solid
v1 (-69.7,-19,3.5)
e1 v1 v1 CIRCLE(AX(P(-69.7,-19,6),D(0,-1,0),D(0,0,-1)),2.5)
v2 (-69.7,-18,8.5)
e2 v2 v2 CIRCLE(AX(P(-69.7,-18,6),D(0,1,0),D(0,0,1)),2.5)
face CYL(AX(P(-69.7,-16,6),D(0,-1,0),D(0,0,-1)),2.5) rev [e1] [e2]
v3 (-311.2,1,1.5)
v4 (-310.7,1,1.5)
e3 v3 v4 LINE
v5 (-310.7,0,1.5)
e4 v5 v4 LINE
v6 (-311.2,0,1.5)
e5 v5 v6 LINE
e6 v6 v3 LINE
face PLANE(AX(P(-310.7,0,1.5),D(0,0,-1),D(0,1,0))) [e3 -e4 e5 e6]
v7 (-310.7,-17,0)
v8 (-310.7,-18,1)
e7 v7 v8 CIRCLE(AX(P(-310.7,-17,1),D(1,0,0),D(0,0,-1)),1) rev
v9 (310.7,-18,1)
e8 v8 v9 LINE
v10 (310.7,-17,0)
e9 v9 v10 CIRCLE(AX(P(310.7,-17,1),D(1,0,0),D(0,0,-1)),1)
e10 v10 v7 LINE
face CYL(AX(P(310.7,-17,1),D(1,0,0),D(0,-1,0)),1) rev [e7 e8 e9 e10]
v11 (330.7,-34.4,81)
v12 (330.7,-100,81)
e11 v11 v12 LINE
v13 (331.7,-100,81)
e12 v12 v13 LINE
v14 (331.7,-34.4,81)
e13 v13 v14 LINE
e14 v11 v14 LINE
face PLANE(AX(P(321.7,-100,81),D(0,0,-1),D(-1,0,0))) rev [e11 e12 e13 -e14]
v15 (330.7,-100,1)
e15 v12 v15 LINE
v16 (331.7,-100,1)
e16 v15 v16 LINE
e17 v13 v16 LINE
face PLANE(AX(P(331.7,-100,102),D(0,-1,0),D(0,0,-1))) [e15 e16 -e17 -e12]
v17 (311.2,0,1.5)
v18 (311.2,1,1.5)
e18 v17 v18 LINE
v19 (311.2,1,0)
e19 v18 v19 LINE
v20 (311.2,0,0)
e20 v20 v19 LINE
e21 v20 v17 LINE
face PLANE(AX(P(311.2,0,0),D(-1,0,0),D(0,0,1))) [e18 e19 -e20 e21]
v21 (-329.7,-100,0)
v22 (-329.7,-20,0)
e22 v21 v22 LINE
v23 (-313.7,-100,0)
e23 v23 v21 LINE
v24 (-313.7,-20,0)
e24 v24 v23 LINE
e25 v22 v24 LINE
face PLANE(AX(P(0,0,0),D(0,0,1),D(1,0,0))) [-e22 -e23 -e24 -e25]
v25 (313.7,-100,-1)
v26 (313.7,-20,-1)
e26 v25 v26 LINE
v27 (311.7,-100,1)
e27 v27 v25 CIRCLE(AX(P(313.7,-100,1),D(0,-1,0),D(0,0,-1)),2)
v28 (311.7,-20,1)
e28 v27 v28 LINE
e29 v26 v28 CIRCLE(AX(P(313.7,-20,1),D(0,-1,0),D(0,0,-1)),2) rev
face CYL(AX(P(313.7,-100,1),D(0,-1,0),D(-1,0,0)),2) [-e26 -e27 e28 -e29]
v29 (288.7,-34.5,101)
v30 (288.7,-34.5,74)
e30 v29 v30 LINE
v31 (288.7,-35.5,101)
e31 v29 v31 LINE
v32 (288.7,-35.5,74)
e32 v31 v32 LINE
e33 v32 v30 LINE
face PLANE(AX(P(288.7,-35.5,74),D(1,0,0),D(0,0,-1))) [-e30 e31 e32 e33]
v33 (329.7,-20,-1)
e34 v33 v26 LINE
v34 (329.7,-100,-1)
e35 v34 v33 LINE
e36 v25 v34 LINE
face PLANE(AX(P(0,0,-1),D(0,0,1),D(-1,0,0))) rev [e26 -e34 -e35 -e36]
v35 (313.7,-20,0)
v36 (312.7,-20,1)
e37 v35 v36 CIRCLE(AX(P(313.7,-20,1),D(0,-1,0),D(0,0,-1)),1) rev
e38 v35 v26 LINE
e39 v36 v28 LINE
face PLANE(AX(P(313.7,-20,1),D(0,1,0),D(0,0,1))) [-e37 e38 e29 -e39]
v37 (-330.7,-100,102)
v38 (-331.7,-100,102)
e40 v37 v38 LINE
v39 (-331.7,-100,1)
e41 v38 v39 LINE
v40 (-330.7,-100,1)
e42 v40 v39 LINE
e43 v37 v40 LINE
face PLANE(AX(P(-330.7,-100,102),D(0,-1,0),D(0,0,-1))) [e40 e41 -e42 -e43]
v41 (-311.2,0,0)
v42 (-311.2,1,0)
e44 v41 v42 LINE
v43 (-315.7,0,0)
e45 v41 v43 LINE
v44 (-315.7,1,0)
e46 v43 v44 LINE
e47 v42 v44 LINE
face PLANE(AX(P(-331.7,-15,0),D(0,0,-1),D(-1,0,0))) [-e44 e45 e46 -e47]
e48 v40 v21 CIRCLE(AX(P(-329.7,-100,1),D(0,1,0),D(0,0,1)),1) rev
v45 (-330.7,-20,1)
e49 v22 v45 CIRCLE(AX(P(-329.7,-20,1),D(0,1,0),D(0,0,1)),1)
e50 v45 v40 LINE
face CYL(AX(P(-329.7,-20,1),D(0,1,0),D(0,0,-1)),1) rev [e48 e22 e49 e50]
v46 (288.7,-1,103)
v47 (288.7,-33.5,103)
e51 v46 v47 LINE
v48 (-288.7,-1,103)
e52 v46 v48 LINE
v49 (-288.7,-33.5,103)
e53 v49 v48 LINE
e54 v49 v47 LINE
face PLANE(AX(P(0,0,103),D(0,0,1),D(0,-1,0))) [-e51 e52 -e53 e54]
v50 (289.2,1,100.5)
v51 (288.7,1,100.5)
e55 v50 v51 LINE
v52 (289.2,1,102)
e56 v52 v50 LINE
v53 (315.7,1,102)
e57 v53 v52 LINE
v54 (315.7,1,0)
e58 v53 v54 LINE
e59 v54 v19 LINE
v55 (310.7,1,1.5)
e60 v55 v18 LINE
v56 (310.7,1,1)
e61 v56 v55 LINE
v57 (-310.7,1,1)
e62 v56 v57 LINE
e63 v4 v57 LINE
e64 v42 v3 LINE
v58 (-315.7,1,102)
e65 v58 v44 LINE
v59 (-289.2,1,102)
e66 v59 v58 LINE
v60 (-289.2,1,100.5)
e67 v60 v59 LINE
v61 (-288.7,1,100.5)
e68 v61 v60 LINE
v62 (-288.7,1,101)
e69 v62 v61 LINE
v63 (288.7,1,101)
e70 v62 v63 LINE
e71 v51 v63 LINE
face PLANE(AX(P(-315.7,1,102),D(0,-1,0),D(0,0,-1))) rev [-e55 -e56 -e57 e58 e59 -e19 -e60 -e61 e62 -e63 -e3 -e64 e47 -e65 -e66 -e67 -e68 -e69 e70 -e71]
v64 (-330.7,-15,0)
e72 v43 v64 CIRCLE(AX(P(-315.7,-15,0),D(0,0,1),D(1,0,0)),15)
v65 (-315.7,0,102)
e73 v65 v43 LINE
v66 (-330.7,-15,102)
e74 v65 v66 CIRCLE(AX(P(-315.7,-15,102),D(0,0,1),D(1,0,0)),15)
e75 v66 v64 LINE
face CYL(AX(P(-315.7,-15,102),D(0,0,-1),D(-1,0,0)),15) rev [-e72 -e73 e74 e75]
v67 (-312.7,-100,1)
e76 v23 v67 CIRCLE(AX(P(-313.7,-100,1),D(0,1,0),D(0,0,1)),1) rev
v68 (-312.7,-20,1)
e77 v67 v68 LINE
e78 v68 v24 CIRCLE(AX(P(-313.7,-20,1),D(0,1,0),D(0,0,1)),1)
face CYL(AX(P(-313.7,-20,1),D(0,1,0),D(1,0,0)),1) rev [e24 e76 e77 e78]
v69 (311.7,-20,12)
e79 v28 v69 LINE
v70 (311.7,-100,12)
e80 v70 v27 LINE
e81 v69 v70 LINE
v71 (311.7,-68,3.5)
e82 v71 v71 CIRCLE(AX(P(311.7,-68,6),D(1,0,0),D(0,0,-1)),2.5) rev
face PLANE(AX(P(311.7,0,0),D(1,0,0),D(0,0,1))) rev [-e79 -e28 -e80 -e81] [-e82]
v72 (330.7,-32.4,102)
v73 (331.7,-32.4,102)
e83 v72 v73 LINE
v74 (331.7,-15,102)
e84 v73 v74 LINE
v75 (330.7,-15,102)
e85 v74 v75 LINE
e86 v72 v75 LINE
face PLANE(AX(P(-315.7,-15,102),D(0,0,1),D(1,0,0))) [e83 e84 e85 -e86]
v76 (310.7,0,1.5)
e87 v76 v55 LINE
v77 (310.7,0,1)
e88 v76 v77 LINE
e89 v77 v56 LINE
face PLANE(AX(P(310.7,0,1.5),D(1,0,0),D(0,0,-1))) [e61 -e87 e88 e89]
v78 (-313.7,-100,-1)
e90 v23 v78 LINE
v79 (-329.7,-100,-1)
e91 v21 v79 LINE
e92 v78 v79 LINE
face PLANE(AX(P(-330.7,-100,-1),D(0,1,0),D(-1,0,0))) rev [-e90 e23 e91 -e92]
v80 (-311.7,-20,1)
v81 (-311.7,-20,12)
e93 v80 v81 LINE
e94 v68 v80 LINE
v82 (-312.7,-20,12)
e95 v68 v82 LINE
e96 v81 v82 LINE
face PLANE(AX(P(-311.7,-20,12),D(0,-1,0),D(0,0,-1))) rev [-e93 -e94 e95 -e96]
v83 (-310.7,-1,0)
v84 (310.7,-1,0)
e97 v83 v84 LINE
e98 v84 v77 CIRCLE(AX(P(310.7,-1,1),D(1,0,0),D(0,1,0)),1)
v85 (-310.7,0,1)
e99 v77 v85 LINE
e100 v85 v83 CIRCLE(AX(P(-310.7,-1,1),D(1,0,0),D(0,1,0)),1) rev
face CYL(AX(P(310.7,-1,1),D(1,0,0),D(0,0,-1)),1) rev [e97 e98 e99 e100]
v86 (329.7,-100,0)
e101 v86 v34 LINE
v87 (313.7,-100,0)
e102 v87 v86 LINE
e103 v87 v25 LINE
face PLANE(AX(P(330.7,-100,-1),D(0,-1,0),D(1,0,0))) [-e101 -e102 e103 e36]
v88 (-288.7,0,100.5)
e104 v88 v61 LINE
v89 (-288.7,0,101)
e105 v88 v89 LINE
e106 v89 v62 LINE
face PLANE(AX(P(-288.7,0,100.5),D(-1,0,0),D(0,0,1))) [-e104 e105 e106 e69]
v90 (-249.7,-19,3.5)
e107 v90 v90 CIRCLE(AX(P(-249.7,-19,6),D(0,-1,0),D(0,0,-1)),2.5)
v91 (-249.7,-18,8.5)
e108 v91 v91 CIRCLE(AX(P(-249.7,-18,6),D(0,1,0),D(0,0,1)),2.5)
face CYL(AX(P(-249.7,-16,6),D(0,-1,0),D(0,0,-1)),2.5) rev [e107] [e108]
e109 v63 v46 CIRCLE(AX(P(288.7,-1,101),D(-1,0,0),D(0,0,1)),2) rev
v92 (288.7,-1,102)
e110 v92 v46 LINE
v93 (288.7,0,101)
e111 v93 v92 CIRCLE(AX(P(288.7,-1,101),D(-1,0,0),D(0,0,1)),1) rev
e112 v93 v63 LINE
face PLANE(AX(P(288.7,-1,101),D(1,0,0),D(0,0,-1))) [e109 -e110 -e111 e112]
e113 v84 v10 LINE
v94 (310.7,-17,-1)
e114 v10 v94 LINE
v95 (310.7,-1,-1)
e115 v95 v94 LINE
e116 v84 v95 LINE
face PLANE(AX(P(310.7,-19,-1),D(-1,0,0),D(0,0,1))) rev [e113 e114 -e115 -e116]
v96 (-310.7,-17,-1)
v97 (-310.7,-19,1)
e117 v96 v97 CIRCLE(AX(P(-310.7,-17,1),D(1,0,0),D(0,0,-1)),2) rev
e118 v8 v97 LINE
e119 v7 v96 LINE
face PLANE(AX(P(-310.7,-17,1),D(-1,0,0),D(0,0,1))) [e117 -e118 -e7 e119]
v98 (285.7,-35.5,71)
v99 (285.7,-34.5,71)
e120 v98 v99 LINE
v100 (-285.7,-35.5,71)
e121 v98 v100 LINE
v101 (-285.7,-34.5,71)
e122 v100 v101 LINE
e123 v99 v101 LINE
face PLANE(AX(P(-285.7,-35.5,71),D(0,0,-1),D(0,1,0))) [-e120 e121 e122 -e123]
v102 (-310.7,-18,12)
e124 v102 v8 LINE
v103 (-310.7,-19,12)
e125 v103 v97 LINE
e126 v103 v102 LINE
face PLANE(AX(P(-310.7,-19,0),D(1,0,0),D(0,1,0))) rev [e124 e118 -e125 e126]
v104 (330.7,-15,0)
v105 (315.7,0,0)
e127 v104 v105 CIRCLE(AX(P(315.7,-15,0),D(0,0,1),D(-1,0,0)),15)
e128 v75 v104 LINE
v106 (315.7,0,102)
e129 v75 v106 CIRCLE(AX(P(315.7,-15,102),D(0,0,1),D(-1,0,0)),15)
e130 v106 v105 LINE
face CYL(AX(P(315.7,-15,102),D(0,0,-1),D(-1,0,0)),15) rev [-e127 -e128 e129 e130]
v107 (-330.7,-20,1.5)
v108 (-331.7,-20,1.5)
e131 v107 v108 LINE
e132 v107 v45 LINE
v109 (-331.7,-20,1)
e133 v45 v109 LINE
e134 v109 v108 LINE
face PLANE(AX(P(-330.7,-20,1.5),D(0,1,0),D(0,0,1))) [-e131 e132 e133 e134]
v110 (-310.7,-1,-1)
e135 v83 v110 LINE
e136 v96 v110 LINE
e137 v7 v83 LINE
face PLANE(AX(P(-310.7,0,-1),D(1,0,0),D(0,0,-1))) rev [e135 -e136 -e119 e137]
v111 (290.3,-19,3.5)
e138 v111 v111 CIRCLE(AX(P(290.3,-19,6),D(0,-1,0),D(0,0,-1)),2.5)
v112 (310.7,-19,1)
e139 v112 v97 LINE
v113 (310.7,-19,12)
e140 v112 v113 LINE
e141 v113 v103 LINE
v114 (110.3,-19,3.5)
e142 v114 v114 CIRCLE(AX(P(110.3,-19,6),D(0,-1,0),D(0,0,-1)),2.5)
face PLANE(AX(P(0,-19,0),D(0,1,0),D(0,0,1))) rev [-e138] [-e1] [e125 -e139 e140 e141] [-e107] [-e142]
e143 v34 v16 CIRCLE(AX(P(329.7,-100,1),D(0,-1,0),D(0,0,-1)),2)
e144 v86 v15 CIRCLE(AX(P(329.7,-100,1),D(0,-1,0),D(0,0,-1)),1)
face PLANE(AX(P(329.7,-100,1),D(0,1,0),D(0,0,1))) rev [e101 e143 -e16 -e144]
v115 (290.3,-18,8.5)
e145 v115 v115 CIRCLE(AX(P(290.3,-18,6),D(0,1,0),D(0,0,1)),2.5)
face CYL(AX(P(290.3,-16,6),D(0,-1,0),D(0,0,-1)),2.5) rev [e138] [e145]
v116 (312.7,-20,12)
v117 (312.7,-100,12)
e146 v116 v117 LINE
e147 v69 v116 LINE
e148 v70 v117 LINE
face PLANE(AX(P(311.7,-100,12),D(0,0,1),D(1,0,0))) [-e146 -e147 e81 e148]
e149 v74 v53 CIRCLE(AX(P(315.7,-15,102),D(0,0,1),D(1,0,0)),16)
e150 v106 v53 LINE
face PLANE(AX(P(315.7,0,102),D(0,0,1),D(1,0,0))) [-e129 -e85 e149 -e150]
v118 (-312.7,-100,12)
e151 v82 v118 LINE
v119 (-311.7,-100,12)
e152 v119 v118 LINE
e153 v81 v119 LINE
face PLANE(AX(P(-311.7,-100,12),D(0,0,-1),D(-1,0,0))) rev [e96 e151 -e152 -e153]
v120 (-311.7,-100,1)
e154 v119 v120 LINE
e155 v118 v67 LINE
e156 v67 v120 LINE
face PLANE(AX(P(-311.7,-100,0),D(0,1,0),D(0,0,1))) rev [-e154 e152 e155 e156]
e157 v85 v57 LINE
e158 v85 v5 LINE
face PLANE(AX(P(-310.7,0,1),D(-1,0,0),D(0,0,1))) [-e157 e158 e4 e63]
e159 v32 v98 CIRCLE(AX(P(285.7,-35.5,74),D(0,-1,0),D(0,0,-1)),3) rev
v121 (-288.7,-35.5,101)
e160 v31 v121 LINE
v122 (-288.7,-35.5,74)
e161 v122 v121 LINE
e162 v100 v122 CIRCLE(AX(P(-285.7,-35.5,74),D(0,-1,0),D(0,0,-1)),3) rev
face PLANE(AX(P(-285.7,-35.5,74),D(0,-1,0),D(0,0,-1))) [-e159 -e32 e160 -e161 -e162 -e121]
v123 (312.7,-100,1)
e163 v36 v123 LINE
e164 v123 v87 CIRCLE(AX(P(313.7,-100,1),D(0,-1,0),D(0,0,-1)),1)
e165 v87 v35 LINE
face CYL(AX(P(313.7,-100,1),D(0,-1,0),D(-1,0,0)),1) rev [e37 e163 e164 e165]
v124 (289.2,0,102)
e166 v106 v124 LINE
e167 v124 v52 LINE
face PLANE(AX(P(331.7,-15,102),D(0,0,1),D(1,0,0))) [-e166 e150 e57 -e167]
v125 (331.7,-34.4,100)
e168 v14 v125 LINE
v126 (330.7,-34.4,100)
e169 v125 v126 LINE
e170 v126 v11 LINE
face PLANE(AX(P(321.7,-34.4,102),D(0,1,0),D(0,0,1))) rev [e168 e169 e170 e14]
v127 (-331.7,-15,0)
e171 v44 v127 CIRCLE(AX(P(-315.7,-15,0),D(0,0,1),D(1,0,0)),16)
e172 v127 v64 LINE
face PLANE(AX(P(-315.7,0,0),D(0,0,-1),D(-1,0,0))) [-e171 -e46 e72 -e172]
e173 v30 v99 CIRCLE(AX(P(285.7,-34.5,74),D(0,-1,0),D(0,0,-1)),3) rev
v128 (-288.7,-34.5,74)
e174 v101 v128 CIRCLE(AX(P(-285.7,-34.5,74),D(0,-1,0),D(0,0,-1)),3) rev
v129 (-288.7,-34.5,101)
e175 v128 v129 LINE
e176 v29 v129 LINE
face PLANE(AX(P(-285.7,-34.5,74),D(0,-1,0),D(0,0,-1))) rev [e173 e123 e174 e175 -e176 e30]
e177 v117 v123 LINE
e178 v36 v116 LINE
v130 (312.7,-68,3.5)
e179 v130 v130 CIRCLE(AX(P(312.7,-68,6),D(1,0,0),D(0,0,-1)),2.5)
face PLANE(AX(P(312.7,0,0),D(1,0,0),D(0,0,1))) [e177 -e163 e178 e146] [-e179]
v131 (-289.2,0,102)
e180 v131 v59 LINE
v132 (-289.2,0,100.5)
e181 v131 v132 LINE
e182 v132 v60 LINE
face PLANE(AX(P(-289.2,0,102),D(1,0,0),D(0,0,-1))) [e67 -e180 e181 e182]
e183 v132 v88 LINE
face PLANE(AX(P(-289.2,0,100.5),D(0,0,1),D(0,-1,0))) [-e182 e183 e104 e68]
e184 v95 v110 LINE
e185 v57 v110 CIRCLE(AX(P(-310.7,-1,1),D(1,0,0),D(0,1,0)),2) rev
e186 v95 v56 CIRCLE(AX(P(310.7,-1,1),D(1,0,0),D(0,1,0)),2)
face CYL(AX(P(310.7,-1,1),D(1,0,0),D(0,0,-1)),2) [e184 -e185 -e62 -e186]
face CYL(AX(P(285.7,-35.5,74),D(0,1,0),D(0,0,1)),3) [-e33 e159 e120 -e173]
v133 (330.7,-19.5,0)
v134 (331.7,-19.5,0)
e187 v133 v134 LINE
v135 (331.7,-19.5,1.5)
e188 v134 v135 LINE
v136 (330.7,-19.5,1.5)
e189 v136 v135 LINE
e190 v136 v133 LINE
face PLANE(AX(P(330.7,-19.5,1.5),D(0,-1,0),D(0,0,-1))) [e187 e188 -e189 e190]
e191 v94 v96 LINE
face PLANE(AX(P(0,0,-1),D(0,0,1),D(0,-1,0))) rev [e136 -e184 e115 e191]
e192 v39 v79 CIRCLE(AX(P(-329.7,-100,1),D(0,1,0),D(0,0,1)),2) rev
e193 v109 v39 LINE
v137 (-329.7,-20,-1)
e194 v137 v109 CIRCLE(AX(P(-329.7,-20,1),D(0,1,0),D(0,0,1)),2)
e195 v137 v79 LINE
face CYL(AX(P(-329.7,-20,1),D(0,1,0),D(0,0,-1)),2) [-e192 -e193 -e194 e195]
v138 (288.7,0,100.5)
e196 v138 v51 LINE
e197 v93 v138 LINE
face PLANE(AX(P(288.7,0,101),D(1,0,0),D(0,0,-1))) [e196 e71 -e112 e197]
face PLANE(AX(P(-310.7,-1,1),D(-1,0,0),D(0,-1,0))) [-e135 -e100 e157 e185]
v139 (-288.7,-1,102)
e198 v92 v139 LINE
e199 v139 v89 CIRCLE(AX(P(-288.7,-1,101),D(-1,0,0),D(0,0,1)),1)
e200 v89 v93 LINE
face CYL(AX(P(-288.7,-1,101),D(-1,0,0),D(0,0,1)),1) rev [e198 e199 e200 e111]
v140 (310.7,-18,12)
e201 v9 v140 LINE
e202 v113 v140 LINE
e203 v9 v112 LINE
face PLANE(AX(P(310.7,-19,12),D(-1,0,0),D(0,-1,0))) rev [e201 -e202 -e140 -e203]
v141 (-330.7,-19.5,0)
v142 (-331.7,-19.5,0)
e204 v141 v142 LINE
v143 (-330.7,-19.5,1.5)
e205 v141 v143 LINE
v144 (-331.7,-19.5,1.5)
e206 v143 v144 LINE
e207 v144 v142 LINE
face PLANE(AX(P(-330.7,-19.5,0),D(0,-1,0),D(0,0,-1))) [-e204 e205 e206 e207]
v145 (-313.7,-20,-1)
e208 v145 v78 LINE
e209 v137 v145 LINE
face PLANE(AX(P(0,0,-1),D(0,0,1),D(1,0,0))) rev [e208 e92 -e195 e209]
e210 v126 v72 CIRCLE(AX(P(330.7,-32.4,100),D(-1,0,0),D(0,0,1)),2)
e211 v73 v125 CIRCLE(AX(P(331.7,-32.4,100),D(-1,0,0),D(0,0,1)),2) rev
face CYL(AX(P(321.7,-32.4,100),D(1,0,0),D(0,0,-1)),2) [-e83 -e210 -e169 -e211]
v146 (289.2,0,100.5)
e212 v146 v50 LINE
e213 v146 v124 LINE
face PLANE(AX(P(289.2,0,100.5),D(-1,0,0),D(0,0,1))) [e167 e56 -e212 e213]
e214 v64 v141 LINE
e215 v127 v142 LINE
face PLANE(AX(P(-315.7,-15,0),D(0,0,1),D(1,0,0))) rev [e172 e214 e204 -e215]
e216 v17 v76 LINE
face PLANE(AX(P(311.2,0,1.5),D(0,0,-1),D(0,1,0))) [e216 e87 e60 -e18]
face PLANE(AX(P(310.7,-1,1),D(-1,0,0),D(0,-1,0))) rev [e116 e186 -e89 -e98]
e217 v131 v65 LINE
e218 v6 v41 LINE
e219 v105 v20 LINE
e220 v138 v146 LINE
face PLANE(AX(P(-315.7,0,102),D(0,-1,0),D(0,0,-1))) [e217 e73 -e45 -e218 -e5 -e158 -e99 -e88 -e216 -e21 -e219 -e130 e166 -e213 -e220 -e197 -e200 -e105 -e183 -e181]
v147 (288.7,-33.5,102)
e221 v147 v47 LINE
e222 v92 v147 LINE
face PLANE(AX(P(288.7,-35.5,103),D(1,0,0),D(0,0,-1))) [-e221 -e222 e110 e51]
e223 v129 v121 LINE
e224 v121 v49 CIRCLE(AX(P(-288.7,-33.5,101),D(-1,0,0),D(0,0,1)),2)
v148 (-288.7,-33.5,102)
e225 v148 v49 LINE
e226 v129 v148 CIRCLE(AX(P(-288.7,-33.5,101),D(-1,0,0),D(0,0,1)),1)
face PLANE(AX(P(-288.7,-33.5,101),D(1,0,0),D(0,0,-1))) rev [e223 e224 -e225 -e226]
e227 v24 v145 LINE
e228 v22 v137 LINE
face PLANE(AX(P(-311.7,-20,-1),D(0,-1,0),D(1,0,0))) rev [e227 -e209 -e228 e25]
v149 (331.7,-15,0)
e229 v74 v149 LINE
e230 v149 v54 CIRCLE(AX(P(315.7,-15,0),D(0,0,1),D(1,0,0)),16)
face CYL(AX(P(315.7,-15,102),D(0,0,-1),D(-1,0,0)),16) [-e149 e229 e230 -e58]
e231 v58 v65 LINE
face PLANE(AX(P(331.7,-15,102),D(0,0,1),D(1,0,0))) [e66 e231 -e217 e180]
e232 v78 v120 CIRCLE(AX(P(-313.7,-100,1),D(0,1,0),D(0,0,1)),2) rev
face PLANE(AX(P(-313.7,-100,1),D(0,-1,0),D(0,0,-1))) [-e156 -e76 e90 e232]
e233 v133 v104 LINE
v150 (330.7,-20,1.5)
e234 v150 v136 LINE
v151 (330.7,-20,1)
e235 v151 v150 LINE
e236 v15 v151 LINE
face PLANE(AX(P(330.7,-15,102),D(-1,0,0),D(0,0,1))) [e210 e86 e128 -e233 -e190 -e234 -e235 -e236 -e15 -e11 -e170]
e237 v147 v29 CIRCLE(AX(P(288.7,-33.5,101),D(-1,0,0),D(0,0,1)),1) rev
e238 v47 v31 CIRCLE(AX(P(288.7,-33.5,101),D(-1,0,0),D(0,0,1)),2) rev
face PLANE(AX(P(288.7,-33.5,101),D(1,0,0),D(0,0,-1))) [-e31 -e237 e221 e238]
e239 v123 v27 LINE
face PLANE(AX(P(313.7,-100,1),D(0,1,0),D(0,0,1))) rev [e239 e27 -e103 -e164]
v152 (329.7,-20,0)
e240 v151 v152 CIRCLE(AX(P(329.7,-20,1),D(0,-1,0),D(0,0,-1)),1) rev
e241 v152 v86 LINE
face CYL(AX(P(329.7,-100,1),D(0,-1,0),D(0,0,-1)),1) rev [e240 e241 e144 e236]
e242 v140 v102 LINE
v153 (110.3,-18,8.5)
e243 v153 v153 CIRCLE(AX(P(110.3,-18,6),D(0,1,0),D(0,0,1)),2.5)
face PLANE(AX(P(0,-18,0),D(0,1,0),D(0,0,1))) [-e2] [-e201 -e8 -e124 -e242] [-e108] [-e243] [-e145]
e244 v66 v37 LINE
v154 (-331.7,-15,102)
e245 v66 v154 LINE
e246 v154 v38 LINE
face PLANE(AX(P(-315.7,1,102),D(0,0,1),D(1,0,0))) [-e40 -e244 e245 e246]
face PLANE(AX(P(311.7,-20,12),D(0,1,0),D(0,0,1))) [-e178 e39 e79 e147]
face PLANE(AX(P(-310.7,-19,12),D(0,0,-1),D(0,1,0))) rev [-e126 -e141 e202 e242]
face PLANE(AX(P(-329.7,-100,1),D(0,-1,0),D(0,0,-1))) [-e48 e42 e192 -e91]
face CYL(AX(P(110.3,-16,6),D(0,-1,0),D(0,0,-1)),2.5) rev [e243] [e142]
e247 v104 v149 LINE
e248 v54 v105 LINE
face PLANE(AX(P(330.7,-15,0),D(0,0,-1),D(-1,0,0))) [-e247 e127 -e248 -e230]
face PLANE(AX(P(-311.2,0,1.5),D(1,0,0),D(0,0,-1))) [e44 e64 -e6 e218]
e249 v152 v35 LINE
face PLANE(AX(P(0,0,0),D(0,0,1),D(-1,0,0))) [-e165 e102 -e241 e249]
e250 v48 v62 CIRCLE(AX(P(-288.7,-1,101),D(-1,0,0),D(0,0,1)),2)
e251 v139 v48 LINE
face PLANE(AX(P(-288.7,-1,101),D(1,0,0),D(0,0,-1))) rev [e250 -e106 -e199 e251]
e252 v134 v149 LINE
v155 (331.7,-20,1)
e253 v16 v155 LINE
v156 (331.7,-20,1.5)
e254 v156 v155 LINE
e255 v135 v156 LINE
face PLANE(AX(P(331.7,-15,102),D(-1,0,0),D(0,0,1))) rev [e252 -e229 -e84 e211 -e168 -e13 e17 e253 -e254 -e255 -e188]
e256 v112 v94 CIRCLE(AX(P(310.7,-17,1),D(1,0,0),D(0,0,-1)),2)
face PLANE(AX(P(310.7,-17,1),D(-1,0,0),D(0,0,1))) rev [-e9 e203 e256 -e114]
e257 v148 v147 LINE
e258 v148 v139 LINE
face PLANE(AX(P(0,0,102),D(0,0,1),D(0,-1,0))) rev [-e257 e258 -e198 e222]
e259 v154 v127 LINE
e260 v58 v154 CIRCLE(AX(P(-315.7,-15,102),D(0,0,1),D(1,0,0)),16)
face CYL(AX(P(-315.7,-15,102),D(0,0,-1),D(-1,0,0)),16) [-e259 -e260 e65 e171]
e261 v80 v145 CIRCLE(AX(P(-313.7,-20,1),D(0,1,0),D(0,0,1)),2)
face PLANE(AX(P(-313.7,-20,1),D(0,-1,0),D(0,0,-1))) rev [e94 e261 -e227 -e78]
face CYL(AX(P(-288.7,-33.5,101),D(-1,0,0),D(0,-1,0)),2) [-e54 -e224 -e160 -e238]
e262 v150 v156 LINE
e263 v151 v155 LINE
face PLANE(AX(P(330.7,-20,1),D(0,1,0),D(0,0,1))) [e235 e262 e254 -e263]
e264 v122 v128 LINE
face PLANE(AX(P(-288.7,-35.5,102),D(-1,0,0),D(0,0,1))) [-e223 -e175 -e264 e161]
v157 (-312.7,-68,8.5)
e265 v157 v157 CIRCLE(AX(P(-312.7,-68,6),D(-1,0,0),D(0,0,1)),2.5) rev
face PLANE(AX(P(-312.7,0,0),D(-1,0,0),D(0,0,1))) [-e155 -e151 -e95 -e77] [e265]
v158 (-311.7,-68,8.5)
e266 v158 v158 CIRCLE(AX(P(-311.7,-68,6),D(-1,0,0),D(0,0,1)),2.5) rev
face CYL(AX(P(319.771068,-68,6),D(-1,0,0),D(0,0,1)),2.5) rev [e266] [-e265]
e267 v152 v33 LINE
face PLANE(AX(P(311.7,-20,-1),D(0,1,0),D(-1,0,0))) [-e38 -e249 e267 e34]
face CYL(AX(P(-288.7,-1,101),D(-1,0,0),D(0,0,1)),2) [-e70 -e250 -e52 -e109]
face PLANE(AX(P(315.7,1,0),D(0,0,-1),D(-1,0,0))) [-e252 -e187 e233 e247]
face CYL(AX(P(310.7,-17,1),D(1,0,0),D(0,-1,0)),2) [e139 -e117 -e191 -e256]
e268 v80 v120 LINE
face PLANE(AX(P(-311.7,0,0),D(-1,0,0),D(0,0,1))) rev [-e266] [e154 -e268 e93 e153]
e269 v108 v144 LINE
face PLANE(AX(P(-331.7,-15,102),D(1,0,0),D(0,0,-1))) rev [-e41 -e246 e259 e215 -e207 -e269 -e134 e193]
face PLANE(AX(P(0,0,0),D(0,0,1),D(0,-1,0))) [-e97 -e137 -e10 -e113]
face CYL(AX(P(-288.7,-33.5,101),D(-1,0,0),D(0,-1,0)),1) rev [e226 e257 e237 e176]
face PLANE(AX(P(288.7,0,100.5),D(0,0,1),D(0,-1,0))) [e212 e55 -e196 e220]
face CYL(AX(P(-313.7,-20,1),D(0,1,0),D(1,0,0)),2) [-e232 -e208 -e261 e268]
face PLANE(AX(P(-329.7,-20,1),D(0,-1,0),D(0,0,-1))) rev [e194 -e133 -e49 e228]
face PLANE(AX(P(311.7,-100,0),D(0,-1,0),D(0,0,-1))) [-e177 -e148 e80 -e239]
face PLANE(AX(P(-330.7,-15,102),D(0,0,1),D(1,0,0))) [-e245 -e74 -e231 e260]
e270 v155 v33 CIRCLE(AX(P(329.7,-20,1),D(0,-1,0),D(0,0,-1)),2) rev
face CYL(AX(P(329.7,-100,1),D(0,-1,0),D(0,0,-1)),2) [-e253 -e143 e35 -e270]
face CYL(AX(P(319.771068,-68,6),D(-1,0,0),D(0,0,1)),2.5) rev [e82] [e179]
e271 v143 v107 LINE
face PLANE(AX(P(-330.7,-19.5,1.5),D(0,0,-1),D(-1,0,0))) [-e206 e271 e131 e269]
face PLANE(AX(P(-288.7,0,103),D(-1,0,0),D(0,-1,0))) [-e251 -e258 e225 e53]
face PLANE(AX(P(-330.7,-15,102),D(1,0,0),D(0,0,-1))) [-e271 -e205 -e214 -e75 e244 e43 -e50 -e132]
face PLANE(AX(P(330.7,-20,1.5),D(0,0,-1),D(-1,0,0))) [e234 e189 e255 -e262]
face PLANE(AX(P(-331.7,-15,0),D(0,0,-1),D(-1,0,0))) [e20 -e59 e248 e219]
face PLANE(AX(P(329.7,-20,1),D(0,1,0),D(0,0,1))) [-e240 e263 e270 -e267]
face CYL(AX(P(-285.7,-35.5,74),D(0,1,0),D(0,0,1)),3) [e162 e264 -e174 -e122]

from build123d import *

# Parameters (mm, degrees)
BASE_FLANGE1_DEPTH             = 102
EDGE_FLANGE1_STRIP_W           = 6
EDGE_FLANGE1_STRIP_H           = 1
EDGE_FLANGE1_STRIP_CUT_DEPTH   = 621.4
EDGE_FLANGE1_RELIEF_W          = 6.5
EDGE_FLANGE1_RELIEF_H          = 0.5
EDGE_FLANGE1_RELIEF_CUT_DEPTH  = 1
EDGE_FLANGE1_DEPTH             = 621.4
EDGE_FLANGE2_STRIP_W           = 6
EDGE_FLANGE2_STRIP_H           = 1
EDGE_FLANGE2_STRIP_CUT_DEPTH   = 621.4
EDGE_FLANGE2_DEPTH             = 621.4
EDGE_FLANGE3_STRIP_W           = 6
EDGE_FLANGE3_STRIP_H           = 1
EDGE_FLANGE3_STRIP_CUT_DEPTH   = 80
EDGE_FLANGE3_RELIEF_W          = 6.5
EDGE_FLANGE3_RELIEF_H          = 0.5
EDGE_FLANGE3_RELIEF_CUT_DEPTH  = 1
EDGE_FLANGE3_DEPTH             = 80
EDGE_FLANGE4_STRIP_W           = 6
EDGE_FLANGE4_STRIP_H           = 1
EDGE_FLANGE4_STRIP_CUT_DEPTH   = 80
EDGE_FLANGE4_DEPTH             = 80
EDGE_FLANGE5_STRIP_W           = 6
EDGE_FLANGE5_STRIP_H           = 1
EDGE_FLANGE5_STRIP_CUT_DEPTH   = 577.4
EDGE_FLANGE5_RELIEF_W          = 6.5
EDGE_FLANGE5_RELIEF_H          = 0.5
EDGE_FLANGE5_RELIEF_CUT_DEPTH  = 1
EDGE_FLANGE5_DEPTH             = 577.4
SKETCH25_R                     = 2.5
CUT_EXTRUDE1_DEPTH             = 3
SKETCH26_R                     = 2.5
CUT_EXTRUDE2_DEPTH             = 3
CUT_EXTRUDE2_DIRECTION_2_REACH = 661.221
EDGE_FLANGE7_STRIP_W           = 6
EDGE_FLANGE7_STRIP_H           = 1
EDGE_FLANGE7_STRIP_CUT_DEPTH   = 577.4
EDGE_FLANGE7_DEPTH             = 577.4
EDGE_FLANGE7_FLAT_DEPTH        = 1
SKETCH30_W                     = 21
SKETCH30_H                     = 65.6
CUT_EXTRUDE3_DEPTH             = 10
FILLET1_R                      = 2


# Sheet-metal steps are written as plain solids
with BuildPart() as part:
    # Sketch1 → Base-Flange1 (new body)
    with BuildSketch(Plane.XY):
        with BuildLine():
            Line((-330.7, -100), (-330.7, -15))
            ThreePointArc((-330.7, -15), (-326.306601718, -4.393398282), (-315.7, 0))
            Line((-315.7, 0), (315.7, 0))
            ThreePointArc((315.7, 0), (326.306601718, -4.393398282), (330.7, -15))
            Line((330.7, -15), (330.7, -100))
            Line((330.7, -100), (331.7, -100))
            Line((331.7, -100), (331.7, -15))
            ThreePointArc((331.7, -15), (327.013708499, -3.686291501), (315.7, 1))
            Line((315.7, 1), (-315.7, 1))
            ThreePointArc((-315.7, 1), (-327.013708499, -3.686291501), (-331.7, -15))
            Line((-331.7, -15), (-331.7, -100))
            Line((-331.7, -100), (-330.7, -100))
        make_face()
    extrude(amount=BASE_FLANGE1_DEPTH)

    # Edge-Flange1 strip (across the edge) → Edge-Flange1 strip cut (cut)
    with BuildSketch(Plane(origin=(-310.7, 0, 0), x_dir=(0, 0, 1), z_dir=(1, 0, 0))):
        with Locations((-2, -0.5)):
            Rectangle(EDGE_FLANGE1_STRIP_W, EDGE_FLANGE1_STRIP_H)
    extrude(amount=EDGE_FLANGE1_STRIP_CUT_DEPTH, mode=Mode.SUBTRACT)

    # Edge-Flange1 relief (on the sheet) → Edge-Flange1 relief cut (cut)
    with BuildSketch(Plane(origin=(-310.7, 0, 1), x_dir=(0, 0, 1), z_dir=(0, -1, 0))):
        with Locations((-2.75, 0.25)):
            Rectangle(EDGE_FLANGE1_RELIEF_W, EDGE_FLANGE1_RELIEF_H)
        with Locations((-2.75, -621.65)):
            Rectangle(EDGE_FLANGE1_RELIEF_W, EDGE_FLANGE1_RELIEF_H)
    extrude(amount=-EDGE_FLANGE1_RELIEF_CUT_DEPTH, mode=Mode.SUBTRACT)

    # Edge-Flange1 section (across the edge) → Edge-Flange1 (add)
    with BuildSketch(Plane(origin=(-310.7, 0, 0), x_dir=(0, 0, 1), z_dir=(1, 0, 0))):
        with BuildLine():
            Line((-1, 1), (-1, 19))
            Line((-1, 19), (0, 19))
            Line((0, 19), (0, 1))
            ThreePointArc((0, 1), (0.292893219, 0.292893219), (1, 0))
            Line((1, 0), (1, -1))
            ThreePointArc((1, -1), (-0.414213562, -0.414213562), (-1, 1))
        make_face()
    extrude(amount=EDGE_FLANGE1_DEPTH)

    # Edge-Flange2 strip (across the edge) → Edge-Flange2 strip cut (cut)
    with BuildSketch(Plane(origin=(-310.7, -19, 0), x_dir=(0, 1, 0), z_dir=(1, 0, 0))):
        with Locations((-1, -0.5)):
            Rectangle(EDGE_FLANGE2_STRIP_W, EDGE_FLANGE2_STRIP_H)
    extrude(amount=EDGE_FLANGE2_STRIP_CUT_DEPTH, mode=Mode.SUBTRACT)

    # Edge-Flange2 section (across the edge) → Edge-Flange2 (add)
    with BuildSketch(Plane(origin=(-310.7, -19, 0), x_dir=(0, 1, 0), z_dir=(1, 0, 0))):
        with BuildLine():
            Line((0, 1), (0, 12))
            Line((0, 12), (1, 12))
            Line((1, 12), (1, 1))
            ThreePointArc((1, 1), (1.292893219, 0.292893219), (2, 0))
            Line((2, 0), (2, -1))
            ThreePointArc((2, -1), (0.585786438, -0.414213562), (0, 1))
        make_face()
    extrude(amount=EDGE_FLANGE2_DEPTH)

    # Edge-Flange3 strip (across the edge) → Edge-Flange3 strip cut (cut)
    with BuildSketch(Plane(origin=(-330.7, -100, 0), x_dir=(0, 0, 1), z_dir=(0, 1, 0))):
        with Locations((-2, -0.5)):
            Rectangle(EDGE_FLANGE3_STRIP_W, EDGE_FLANGE3_STRIP_H)
    edge_flange3_strip_cut = extrude(amount=EDGE_FLANGE3_STRIP_CUT_DEPTH, mode=Mode.SUBTRACT)

    # Edge-Flange3 relief (on the sheet) → Edge-Flange3 relief cut (cut)
    with BuildSketch(Plane(origin=(-330.7, -100, 1), x_dir=(0, 0, 1), z_dir=(1, 0, 0))):
        with Locations((-2.75, -80.25)):
            Rectangle(EDGE_FLANGE3_RELIEF_W, EDGE_FLANGE3_RELIEF_H)
    edge_flange3_relief_cut = extrude(amount=-EDGE_FLANGE3_RELIEF_CUT_DEPTH, mode=Mode.SUBTRACT)

    # Edge-Flange3 section (across the edge) → Edge-Flange3 (add)
    with BuildSketch(Plane(origin=(-330.7, -100, 0), x_dir=(0, 0, 1), z_dir=(0, 1, 0))):
        with BuildLine():
            Line((-1, 1), (-1, 19))
            Line((-1, 19), (0, 19))
            Line((0, 19), (0, 1))
            ThreePointArc((0, 1), (0.292893219, 0.292893219), (1, 0))
            Line((1, 0), (1, -1))
            ThreePointArc((1, -1), (-0.414213562, -0.414213562), (-1, 1))
        make_face()
    edge_flange3 = extrude(amount=EDGE_FLANGE3_DEPTH)

    # Edge-Flange4 strip (across the edge) → Edge-Flange4 strip cut (cut)
    with BuildSketch(Plane(origin=(-311.7, -100, 0), x_dir=(-1, 0, 0), z_dir=(0, 1, 0))):
        with Locations((-1, -0.5)):
            Rectangle(EDGE_FLANGE4_STRIP_W, EDGE_FLANGE4_STRIP_H)
    edge_flange4_strip_cut = extrude(amount=EDGE_FLANGE4_STRIP_CUT_DEPTH, mode=Mode.SUBTRACT)

    # Edge-Flange4 section (across the edge) → Edge-Flange4 (add)
    with BuildSketch(Plane(origin=(-311.7, -100, 0), x_dir=(-1, 0, 0), z_dir=(0, 1, 0))):
        with BuildLine():
            Line((0, 1), (0, 12))
            Line((0, 12), (1, 12))
            Line((1, 12), (1, 1))
            ThreePointArc((1, 1), (1.292893219, 0.292893219), (2, 0))
            Line((2, 0), (2, -1))
            ThreePointArc((2, -1), (0.585786438, -0.414213562), (0, 1))
        make_face()
    edge_flange4 = extrude(amount=EDGE_FLANGE4_DEPTH)

    # Mirror1: Edge-Flange3 strip cut, Edge-Flange3 relief cut, Edge-Flange3, Edge-Flange4 strip cut, Edge-Flange4 across plane
    add(edge_flange3_strip_cut.mirror(Plane(origin=(0, 0, 0), x_dir=(0, 0, 1), z_dir=(1, 0, 0))), mode=Mode.SUBTRACT)
    add(edge_flange3_relief_cut.mirror(Plane(origin=(0, 0, 0), x_dir=(0, 0, 1), z_dir=(1, 0, 0))), mode=Mode.SUBTRACT)
    add(edge_flange3.mirror(Plane(origin=(0, 0, 0), x_dir=(0, 0, 1), z_dir=(1, 0, 0))))
    add(edge_flange4_strip_cut.mirror(Plane(origin=(0, 0, 0), x_dir=(0, 0, 1), z_dir=(1, 0, 0))), mode=Mode.SUBTRACT)
    add(edge_flange4.mirror(Plane(origin=(0, 0, 0), x_dir=(0, 0, 1), z_dir=(1, 0, 0))))

    # Edge-Flange5 strip (across the edge) → Edge-Flange5 strip cut (cut)
    with BuildSketch(Plane(origin=(288.7, 0, 102), x_dir=(0, 0, -1), z_dir=(-1, 0, 0))):
        with Locations((-2, -0.5)):
            Rectangle(EDGE_FLANGE5_STRIP_W, EDGE_FLANGE5_STRIP_H)
    extrude(amount=EDGE_FLANGE5_STRIP_CUT_DEPTH, mode=Mode.SUBTRACT)

    # Edge-Flange5 relief (on the sheet) → Edge-Flange5 relief cut (cut)
    with BuildSketch(Plane(origin=(288.7, 0, 101), x_dir=(0, 0, -1), z_dir=(0, -1, 0))):
        with Locations((-2.75, 0.25)):
            Rectangle(EDGE_FLANGE5_RELIEF_W, EDGE_FLANGE5_RELIEF_H)
        with Locations((-2.75, -577.65)):
            Rectangle(EDGE_FLANGE5_RELIEF_W, EDGE_FLANGE5_RELIEF_H)
    extrude(amount=-EDGE_FLANGE5_RELIEF_CUT_DEPTH, mode=Mode.SUBTRACT)

    # Edge-Flange5 section (across the edge) → Edge-Flange5 (add)
    with BuildSketch(Plane(origin=(288.7, 0, 102), x_dir=(0, 0, -1), z_dir=(-1, 0, 0))):
        with BuildLine():
            Line((-1, 1), (-1, 35.5))
            Line((-1, 35.5), (0, 35.5))
            Line((0, 35.5), (0, 1))
            ThreePointArc((0, 1), (0.292893219, 0.292893219), (1, 0))
            Line((1, 0), (1, -1))
            ThreePointArc((1, -1), (-0.414213562, -0.414213562), (-1, 1))
        make_face()
    extrude(amount=EDGE_FLANGE5_DEPTH)

    # Sketch25 → Cut-Extrude1 (cut)
    with BuildSketch(Plane.XZ.offset(19)):
        with Locations(Location((-249.7, 6, 0), (0, 0, 270))):
            Circle(SKETCH25_R)
        with Locations(Location((-69.7, 6, 0), (0, 0, 270))):
            Circle(SKETCH25_R)
        with Locations(Location((110.3, 6, 0), (0, 0, 270))):
            Circle(SKETCH25_R)
        with Locations(Location((290.3, 6, 0), (0, 0, 270))):
            Circle(SKETCH25_R)
        with Locations((470.3, 6)):
            Circle(SKETCH25_R)
        with Locations((650.3, 6)):
            Circle(SKETCH25_R)
        with Locations((830.3, 6)):
            Circle(SKETCH25_R)
    extrude(amount=-CUT_EXTRUDE1_DEPTH, mode=Mode.SUBTRACT)

    # Sketch26 → Cut-Extrude2 (cut)
    with BuildSketch(Plane(origin=(-311.7, 0, 0), x_dir=(0, 0, -1), z_dir=(1, 0, 0))):
        with Locations((-6, -68)):
            Circle(SKETCH26_R)
    extrude(amount=-CUT_EXTRUDE2_DEPTH, mode=Mode.SUBTRACT)

    # Cut-Extrude2 direction 2: up to this face of the body (flat: up to its plane)
    cut_extrude2_direction_2_end = Plane(part.part.faces().sort_by_distance((312.7, -60, 6.5))[0])
    # Sketch26 → Cut-Extrude2 direction 2 (cut, up to the picked face)
    with BuildSketch(Plane(origin=(-311.7, 0, 0), x_dir=(0, 0, -1), z_dir=(1, 0, 0)), mode=Mode.PRIVATE) as cut_extrude2_direction_2_sk1:
        with Locations((-6, -68)):
            Circle(SKETCH26_R)
    cut_extrude2_direction_2_tool1 = split(extrude(cut_extrude2_direction_2_sk1.sketch, amount=CUT_EXTRUDE2_DIRECTION_2_REACH, mode=Mode.PRIVATE), bisect_by=cut_extrude2_direction_2_end, keep=Keep.BOTH, mode=Mode.PRIVATE)
    add(cut_extrude2_direction_2_tool1.solids().sort_by(Axis((-311.7, -68, 6), (1, 0, 0)))[0], mode=Mode.SUBTRACT)

    # Edge-Flange7 strip (across the edge) → Edge-Flange7 strip cut (cut)
    with BuildSketch(Plane(origin=(288.7, -35.5, 102), x_dir=(0, 1, 0), z_dir=(-1, 0, 0))):
        with Locations((-1, -0.5)):
            Rectangle(EDGE_FLANGE7_STRIP_W, EDGE_FLANGE7_STRIP_H)
    extrude(amount=EDGE_FLANGE7_STRIP_CUT_DEPTH, mode=Mode.SUBTRACT)

    # Edge-Flange7 bend section (across the edge) → Edge-Flange7 (add)
    with BuildSketch(Plane(origin=(288.7, -35.5, 102), x_dir=(0, 1, 0), z_dir=(-1, 0, 0))):
        with BuildLine():
            Line((0, 1), (1, 1))
            ThreePointArc((1, 1), (1.292893219, 0.292893219), (2, 0))
            Line((2, 0), (2, -1))
            ThreePointArc((2, -1), (0.585786438, -0.414213562), (0, 1))
        make_face()
    extrude(amount=EDGE_FLANGE7_DEPTH)

    # Edge-Flange7 profile (on flange) → Edge-Flange7 flat (add)
    with BuildSketch(Plane(origin=(0, -35.5, 102), x_dir=(1, 0, 0), z_dir=(0, 1, 0))):
        with BuildLine():
            Line((-288.7, 1), (288.7, 1))
            Line((288.7, 1), (288.7, 28))
            ThreePointArc((288.7, 28), (287.821320344, 30.121320344), (285.7, 31))
            Line((285.7, 31), (-285.7, 31))
            ThreePointArc((-285.7, 31), (-287.821320344, 30.121320344), (-288.7, 28))
            Line((-288.7, 28), (-288.7, 1))
        make_face()
    extrude(amount=EDGE_FLANGE7_FLAT_DEPTH)

    # Sketch30 → Cut-Extrude3 (cut)
    with BuildSketch(Plane(origin=(331.7, 0, 0), x_dir=(0, 0, -1), z_dir=(1, 0, 0))):
        with Locations((-91.5, -67.2)):
            Rectangle(SKETCH30_W, SKETCH30_H)
    extrude(amount=-CUT_EXTRUDE3_DEPTH, mode=Mode.SUBTRACT)

    # Fillet1
    fillet1_edges = [part.edges().sort_by_distance(p)[0] for p in [
        (331.2, -34.4, 102),
    ]]
    fillet(fillet1_edges, radius=FILLET1_R)


solid = part.part
